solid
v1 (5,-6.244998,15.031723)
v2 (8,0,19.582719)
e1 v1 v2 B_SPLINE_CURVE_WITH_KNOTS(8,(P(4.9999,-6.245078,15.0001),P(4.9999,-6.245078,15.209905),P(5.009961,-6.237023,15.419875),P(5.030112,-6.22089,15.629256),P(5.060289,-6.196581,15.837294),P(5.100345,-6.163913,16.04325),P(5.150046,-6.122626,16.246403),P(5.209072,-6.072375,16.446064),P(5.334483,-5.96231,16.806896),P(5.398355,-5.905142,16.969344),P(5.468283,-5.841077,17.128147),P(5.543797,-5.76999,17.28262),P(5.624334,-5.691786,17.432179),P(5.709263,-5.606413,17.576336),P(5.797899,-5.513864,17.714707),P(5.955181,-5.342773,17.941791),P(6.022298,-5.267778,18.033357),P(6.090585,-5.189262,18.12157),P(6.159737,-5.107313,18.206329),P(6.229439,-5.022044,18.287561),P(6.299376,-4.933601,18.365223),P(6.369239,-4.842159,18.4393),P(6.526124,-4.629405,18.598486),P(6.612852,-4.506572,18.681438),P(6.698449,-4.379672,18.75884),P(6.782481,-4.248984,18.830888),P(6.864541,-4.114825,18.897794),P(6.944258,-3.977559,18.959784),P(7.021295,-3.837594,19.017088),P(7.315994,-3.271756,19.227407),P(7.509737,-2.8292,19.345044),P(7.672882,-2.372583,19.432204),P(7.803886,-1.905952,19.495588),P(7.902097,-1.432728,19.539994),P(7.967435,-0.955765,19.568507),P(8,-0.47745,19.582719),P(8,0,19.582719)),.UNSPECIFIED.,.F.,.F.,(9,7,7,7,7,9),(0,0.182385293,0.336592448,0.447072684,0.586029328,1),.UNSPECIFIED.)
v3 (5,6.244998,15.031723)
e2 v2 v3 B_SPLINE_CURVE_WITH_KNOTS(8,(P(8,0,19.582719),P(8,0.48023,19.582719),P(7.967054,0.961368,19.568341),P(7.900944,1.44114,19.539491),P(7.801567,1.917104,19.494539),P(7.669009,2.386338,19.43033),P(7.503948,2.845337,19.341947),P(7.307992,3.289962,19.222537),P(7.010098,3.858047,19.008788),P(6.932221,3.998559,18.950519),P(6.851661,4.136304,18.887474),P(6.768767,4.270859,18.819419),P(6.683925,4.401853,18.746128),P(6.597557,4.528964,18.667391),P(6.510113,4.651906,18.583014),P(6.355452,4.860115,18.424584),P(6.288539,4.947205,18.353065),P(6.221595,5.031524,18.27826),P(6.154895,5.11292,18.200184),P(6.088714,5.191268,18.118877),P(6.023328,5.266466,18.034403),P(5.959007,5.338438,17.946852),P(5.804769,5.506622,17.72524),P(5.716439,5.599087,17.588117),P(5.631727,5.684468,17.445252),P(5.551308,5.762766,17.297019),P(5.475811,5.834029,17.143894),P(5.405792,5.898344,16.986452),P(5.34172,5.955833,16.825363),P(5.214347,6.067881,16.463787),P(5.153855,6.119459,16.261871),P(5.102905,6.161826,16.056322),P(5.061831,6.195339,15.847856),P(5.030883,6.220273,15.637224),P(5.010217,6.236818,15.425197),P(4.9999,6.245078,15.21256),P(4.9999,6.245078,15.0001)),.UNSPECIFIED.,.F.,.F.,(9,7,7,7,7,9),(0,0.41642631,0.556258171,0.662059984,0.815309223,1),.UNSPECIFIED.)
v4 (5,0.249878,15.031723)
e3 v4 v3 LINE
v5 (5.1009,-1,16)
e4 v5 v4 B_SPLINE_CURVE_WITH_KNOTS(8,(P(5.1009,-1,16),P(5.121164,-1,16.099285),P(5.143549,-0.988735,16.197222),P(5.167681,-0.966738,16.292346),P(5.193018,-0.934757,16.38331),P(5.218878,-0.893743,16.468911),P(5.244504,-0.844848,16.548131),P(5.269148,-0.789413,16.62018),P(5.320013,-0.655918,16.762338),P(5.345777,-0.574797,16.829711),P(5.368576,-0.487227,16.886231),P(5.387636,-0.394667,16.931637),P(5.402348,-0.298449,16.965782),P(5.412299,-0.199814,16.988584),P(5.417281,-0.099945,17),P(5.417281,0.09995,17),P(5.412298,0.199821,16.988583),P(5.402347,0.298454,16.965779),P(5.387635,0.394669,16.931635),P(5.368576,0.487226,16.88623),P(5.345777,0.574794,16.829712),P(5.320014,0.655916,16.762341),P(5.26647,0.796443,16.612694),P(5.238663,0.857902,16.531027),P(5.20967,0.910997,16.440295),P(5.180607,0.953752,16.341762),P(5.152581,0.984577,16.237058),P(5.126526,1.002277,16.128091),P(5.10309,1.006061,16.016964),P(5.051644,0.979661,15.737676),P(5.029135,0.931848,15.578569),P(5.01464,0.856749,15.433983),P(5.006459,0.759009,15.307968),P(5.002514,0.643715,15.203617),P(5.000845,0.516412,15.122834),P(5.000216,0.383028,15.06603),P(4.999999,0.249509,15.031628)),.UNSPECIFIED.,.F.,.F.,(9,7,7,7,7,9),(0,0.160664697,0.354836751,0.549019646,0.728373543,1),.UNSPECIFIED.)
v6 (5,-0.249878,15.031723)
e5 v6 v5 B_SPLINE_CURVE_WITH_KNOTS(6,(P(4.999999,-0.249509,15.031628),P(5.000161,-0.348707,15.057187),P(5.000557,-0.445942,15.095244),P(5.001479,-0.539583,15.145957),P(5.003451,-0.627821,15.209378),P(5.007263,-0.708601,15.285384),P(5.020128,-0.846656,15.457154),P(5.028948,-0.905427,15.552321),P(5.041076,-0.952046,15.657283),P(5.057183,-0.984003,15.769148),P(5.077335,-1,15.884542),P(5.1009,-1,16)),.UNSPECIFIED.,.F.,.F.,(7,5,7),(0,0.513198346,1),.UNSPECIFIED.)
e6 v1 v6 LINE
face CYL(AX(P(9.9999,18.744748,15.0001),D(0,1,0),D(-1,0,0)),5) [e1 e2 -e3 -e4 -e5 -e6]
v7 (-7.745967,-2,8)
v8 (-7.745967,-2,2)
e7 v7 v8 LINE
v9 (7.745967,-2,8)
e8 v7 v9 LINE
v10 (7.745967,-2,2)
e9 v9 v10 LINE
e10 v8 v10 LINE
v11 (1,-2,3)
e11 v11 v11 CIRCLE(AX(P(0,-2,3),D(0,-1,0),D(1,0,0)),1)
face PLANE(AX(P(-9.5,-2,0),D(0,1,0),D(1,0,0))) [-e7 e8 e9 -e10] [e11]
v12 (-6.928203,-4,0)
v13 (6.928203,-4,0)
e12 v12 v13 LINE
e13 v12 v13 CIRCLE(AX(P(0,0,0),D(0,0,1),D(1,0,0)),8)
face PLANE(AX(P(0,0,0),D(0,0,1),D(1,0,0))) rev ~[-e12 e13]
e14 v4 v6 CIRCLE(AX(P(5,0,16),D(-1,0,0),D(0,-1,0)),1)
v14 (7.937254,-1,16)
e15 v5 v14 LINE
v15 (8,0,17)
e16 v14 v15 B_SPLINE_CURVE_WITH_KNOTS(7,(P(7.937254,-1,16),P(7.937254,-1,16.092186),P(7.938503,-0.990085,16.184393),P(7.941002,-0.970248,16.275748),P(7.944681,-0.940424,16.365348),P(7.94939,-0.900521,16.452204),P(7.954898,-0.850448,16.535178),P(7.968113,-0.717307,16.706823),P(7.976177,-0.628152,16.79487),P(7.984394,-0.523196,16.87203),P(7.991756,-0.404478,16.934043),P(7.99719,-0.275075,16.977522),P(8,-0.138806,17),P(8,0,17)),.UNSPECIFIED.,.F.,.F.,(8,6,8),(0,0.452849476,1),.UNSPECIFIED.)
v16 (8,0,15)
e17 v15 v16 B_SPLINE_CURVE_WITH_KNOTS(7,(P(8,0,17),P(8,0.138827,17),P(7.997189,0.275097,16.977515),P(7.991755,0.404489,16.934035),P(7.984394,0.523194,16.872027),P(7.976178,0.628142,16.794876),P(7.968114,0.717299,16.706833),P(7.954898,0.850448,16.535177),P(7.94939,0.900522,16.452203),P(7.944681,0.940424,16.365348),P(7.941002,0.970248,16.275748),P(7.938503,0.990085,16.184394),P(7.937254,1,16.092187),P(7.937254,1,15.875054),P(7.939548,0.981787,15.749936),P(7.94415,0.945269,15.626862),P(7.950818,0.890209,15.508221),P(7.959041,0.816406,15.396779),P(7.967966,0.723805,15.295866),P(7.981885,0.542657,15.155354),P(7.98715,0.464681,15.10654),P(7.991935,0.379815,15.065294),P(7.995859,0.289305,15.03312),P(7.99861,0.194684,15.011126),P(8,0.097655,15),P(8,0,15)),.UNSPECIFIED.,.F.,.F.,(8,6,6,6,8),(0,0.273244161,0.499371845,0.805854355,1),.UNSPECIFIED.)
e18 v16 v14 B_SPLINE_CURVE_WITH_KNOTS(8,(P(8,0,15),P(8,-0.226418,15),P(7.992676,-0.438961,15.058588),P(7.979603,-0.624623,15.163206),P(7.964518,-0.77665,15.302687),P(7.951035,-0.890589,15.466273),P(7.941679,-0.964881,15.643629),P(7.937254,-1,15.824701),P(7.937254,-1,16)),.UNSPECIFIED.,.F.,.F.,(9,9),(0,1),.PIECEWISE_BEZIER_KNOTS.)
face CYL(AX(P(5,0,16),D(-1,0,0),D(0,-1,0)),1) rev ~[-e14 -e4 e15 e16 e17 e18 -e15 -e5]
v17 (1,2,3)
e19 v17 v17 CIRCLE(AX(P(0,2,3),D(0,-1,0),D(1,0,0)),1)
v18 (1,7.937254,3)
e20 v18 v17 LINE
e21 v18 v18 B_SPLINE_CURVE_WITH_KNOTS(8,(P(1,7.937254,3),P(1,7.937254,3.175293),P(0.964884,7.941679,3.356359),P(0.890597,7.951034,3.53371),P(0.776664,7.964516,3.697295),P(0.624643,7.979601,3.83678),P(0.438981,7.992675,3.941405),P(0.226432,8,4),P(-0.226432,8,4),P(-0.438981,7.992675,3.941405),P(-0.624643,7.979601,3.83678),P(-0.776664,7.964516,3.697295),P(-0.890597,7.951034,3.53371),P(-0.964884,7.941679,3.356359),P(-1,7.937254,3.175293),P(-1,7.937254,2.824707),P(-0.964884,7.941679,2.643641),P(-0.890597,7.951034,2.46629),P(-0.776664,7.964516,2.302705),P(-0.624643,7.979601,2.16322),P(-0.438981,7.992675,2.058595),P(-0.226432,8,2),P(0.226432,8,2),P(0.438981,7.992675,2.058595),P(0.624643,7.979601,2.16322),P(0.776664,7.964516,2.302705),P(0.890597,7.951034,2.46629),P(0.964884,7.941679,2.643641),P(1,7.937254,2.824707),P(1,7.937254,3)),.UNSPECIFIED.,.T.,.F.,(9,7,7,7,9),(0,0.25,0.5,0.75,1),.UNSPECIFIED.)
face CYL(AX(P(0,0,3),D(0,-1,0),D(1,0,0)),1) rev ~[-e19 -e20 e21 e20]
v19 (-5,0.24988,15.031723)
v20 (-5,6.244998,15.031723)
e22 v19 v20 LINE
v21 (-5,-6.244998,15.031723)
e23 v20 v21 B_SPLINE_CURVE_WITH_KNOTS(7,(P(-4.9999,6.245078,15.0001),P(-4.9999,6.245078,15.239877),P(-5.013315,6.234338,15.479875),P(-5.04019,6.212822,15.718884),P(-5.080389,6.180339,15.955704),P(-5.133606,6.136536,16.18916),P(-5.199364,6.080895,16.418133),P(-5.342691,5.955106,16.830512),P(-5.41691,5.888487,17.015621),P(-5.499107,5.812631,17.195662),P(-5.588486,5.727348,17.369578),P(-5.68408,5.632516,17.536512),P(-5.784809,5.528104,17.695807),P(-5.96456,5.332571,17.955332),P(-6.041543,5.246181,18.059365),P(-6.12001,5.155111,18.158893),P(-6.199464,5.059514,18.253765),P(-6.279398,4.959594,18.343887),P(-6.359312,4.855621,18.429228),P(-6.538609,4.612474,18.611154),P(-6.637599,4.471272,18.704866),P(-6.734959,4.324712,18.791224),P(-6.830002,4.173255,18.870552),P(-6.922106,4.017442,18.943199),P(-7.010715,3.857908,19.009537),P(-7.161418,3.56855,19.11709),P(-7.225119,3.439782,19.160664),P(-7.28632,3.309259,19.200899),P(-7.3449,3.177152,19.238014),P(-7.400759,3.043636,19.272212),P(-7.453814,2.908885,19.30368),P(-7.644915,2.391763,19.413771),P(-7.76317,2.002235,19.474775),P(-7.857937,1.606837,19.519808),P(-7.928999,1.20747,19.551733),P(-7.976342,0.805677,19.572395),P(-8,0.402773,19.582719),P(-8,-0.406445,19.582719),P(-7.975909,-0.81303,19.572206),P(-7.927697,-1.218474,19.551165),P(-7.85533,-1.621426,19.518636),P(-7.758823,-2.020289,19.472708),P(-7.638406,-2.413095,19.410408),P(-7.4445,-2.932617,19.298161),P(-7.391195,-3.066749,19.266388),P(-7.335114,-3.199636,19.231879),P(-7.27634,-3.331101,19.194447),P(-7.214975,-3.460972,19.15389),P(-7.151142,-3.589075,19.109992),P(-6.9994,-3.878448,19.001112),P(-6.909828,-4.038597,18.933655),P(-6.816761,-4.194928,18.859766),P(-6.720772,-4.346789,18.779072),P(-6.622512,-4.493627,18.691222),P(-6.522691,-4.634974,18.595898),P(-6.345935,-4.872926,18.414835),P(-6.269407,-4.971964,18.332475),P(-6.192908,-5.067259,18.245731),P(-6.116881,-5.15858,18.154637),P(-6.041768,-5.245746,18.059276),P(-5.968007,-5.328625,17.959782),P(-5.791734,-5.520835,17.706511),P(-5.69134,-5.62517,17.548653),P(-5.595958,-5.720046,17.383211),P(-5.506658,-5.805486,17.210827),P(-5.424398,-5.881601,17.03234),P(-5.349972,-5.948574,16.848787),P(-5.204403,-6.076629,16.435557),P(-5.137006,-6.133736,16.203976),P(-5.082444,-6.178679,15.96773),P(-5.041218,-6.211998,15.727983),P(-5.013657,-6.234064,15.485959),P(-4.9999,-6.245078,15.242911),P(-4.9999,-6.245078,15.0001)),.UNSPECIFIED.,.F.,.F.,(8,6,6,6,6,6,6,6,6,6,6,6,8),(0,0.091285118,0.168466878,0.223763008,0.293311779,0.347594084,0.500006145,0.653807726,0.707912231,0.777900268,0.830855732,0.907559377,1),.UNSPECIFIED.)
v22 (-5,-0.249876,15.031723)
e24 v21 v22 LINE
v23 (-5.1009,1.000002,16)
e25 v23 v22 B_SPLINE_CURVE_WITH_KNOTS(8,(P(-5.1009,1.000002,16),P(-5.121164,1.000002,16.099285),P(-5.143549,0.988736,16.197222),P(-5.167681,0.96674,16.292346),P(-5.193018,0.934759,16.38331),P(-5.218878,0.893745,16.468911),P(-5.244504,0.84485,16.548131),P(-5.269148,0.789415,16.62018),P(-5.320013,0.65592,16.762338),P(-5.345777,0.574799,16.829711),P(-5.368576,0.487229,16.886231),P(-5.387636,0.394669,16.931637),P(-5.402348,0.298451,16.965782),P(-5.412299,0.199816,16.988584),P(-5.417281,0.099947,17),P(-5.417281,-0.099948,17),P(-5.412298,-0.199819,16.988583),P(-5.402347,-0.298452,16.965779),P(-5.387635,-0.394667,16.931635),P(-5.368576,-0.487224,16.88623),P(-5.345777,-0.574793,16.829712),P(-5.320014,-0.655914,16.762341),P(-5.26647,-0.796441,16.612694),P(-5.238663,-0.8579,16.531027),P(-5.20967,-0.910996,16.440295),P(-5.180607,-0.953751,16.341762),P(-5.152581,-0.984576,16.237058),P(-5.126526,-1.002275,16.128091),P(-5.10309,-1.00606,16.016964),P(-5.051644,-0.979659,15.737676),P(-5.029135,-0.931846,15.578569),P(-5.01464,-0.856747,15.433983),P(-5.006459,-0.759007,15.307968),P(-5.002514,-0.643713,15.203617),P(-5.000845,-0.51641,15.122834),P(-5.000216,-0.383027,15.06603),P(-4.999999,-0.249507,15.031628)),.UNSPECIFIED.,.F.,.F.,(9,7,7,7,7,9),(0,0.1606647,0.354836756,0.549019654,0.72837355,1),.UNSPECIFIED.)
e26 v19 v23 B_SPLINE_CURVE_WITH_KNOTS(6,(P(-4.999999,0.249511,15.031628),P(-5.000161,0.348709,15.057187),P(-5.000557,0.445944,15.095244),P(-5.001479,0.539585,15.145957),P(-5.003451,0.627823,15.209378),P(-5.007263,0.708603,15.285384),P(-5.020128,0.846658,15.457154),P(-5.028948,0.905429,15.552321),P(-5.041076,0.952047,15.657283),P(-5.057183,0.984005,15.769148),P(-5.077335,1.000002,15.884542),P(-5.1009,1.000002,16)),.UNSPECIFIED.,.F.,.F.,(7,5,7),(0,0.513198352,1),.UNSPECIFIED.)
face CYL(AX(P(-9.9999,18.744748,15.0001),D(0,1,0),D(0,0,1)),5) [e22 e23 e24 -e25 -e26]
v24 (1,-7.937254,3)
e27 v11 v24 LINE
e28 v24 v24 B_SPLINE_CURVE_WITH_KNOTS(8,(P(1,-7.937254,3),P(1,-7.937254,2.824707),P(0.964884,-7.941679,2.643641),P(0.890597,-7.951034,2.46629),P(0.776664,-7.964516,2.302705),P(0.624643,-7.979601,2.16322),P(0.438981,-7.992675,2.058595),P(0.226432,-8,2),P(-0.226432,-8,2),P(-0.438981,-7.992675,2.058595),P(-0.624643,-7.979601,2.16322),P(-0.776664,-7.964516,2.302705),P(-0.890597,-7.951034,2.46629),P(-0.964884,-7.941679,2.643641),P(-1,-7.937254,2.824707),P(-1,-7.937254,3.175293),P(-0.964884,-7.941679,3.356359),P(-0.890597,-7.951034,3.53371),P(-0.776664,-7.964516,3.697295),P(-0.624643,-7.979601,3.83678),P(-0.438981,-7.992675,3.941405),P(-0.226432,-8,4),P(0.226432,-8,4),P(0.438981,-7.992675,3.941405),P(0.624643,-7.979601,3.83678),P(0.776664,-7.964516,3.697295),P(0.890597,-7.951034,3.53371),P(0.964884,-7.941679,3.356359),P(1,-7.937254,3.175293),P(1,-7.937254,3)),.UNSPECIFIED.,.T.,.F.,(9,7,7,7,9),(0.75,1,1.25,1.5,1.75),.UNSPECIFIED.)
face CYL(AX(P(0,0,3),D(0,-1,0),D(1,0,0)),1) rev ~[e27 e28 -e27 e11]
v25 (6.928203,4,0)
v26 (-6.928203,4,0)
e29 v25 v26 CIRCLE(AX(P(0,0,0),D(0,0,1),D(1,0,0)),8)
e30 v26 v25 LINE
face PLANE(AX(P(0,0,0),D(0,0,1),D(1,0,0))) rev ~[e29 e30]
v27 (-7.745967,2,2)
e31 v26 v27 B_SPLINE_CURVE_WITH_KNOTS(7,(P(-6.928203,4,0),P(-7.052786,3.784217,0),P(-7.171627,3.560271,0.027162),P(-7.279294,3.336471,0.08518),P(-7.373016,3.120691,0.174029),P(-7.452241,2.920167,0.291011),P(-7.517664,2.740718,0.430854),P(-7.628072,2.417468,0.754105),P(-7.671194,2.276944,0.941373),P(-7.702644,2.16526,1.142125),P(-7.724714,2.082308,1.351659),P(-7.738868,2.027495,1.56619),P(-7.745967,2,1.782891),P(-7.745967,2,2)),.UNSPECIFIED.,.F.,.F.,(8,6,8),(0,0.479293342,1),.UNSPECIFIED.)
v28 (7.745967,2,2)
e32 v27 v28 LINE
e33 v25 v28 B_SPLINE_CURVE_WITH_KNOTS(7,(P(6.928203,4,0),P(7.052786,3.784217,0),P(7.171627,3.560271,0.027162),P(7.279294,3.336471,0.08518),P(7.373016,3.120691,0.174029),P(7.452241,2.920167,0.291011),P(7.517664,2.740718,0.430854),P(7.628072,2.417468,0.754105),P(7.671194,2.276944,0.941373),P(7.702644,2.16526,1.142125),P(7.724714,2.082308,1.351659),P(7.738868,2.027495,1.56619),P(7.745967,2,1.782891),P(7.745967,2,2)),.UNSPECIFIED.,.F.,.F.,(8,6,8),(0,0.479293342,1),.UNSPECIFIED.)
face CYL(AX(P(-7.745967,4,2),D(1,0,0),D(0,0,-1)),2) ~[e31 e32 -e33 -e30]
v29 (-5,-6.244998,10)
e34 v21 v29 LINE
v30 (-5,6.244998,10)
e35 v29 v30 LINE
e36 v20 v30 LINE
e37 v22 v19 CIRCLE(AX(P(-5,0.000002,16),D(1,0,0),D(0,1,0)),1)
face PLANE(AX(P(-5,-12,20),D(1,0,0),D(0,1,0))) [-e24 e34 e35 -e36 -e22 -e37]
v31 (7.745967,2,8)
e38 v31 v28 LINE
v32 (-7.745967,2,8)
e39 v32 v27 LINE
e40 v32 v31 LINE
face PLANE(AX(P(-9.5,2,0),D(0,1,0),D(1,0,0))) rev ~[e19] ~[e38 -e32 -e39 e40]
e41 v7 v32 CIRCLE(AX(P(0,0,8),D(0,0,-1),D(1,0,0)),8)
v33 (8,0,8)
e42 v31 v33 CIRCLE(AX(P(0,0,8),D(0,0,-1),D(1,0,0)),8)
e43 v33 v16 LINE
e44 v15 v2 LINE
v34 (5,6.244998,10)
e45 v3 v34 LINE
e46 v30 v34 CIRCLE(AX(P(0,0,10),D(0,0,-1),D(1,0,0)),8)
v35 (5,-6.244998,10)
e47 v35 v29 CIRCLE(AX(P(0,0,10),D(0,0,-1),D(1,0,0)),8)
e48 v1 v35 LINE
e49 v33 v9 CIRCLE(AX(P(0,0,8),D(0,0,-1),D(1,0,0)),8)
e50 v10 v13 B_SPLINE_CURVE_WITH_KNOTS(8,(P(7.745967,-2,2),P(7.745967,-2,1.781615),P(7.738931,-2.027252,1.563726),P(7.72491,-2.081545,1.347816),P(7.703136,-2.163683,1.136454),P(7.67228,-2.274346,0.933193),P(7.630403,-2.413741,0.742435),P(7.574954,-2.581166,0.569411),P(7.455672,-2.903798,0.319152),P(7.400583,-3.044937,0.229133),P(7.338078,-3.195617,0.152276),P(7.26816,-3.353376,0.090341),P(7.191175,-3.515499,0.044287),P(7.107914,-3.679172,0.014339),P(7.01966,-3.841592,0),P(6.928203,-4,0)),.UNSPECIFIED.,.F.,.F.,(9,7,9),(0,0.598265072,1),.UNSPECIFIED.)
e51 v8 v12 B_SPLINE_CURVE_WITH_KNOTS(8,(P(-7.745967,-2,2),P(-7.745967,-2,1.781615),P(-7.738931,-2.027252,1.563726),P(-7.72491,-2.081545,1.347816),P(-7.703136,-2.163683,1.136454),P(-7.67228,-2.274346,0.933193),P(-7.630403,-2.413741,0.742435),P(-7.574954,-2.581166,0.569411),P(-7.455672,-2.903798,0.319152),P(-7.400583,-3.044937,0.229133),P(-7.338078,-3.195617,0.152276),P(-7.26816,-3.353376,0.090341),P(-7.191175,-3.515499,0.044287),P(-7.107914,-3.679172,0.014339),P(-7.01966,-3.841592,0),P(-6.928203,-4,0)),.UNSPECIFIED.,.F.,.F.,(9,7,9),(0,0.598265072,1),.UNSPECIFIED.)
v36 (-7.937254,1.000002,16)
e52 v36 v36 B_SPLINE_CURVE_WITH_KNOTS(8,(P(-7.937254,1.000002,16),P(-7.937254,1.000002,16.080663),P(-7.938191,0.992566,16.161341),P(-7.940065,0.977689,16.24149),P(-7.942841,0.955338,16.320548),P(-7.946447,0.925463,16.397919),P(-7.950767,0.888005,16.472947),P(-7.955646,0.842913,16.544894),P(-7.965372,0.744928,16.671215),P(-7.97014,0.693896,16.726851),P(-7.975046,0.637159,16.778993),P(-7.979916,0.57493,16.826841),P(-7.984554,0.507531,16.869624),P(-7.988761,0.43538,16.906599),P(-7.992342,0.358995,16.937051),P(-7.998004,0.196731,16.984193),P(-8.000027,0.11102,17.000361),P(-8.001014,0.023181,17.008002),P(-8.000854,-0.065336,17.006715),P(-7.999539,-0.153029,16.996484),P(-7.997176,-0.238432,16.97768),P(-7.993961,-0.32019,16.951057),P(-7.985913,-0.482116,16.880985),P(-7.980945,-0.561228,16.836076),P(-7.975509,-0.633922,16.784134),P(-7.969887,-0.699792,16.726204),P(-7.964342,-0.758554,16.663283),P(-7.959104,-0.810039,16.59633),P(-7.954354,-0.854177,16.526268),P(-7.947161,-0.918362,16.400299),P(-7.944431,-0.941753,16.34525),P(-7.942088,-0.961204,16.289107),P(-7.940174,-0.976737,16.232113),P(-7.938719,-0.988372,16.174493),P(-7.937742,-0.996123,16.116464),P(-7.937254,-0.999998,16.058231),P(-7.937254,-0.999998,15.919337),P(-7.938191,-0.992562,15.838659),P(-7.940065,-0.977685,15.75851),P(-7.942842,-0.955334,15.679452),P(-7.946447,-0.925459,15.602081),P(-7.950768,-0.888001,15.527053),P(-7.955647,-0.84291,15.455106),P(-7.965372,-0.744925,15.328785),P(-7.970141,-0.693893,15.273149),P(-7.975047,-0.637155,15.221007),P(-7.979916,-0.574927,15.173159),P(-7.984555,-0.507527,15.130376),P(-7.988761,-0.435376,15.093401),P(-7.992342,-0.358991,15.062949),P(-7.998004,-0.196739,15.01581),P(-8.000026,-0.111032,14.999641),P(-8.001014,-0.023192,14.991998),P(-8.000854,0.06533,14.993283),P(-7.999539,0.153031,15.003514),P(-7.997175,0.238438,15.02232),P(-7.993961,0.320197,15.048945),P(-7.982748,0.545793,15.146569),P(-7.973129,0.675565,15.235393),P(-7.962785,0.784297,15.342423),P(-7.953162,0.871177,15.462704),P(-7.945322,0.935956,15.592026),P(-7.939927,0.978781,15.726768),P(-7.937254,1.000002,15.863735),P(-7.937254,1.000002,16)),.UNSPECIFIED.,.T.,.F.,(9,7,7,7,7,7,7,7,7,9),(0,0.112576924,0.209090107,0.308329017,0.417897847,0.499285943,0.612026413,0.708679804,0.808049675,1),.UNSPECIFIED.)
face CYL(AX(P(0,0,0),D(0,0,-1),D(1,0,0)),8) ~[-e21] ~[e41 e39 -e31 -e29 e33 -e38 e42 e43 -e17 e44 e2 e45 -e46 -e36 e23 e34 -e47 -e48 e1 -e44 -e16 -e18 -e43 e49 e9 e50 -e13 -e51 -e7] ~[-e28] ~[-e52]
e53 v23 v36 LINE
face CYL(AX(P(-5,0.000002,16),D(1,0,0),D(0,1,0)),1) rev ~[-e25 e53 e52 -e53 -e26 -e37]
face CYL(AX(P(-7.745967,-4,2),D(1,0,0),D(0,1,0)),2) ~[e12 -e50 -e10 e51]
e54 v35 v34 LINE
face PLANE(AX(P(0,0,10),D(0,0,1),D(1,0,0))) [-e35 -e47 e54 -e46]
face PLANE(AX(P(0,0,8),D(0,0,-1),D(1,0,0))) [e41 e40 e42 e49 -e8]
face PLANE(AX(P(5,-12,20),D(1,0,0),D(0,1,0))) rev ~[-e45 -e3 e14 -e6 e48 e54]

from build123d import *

# Parameters (mm, degrees)
F0_R         = 8
F1_DEPTH     = 20
F2_W         = 10
F2_H         = 24
F3_DEPTH     = 10
F4_W         = 19
F4_H         = 4
F5_DEPTH     = 8
F6_R         = 1
F7_DEPTH     = 5
F8_R         = 1
F9_DEPTH     = 5
F10_R        = 1
F11_DEPTH    = 8
F12_T1_DEPTH = 37.4894960018
F13_R        = 2


# Not quite as in the source:
# - a fillet or chamfer that OpenCascade refuses, or shapes differently, is made with other operations: its cross-section is extruded or revolved along the edge and cut away or added


with BuildPart() as f1:
    # F0 (on Top) → F1 (new body)
    with BuildSketch(Plane.XY):
        Circle(F0_R)
    extrude(amount=F1_DEPTH)

    # F2 (on face) → F3 (cut)
    with BuildSketch(Plane.XY.offset(20)):
        Rectangle(F2_W, F2_H)
    extrude(amount=-F3_DEPTH, mode=Mode.SUBTRACT)

    # F4 (on face) → F5 (cut)
    with BuildSketch(Plane(origin=(0, 0, 0), x_dir=(1, 0, 0), z_dir=(0, 0, -1))):
        Rectangle(F4_W, F4_H)
    extrude(amount=-F5_DEPTH, mode=Mode.SUBTRACT)

    # F6 (on face) → F7 (cut)
    with BuildSketch(Plane.YZ.offset(-5)):
        with Locations((1.8555e-06, 16)):
            Circle(F6_R)
    extrude(amount=-F7_DEPTH, mode=Mode.SUBTRACT)

    # F8 (on face) → F9 (cut)
    with BuildSketch(Plane(origin=(5, 0, 0), x_dir=(0, -1, 0), z_dir=(-1, 0, 0))):
        with Locations((0, 16)):
            Circle(F8_R)
    extrude(amount=-F9_DEPTH, mode=Mode.SUBTRACT)

    # F10 (on Front) → F11 (cut, symmetric)
    with BuildSketch(Plane.XZ):
        with Locations((0, 3)):
            Circle(F10_R)
    extrude(amount=F11_DEPTH, both=True, mode=Mode.SUBTRACT)

    # F12: fillet of radius 5 on 2 edges, made by hand

    # F12_s2 → F12_t1 (cut)
    with BuildSketch(Plane.XZ.offset(-18.7447480009)):
        with BuildLine():
            ThreePointArc((-9.9999, 20.0001), (-6.4643660941, 18.5356339059), (-4.9999, 15.0001))
            Line((-4.9999, 15.0001), (-4.8999, 15.0001))
            ThreePointArc((-4.8999, 15.0001), (-4.9, 17.50005), (-4.9, 20))
            Line((-4.9, 20), (-5, 20.1))
            ThreePointArc((-5, 20.1), (-7.49995, 20.1), (-9.9999, 20.1001))
            Line((-9.9999, 20.1001), (-9.9999, 20.0001))
        make_face()
        with BuildLine():
            ThreePointArc((4.9999, 15.0001), (6.4643660941, 18.5356339059), (9.9999, 20.0001))
            Line((9.9999, 20.0001), (9.9999, 20.1001))
            ThreePointArc((9.9999, 20.1001), (7.49995, 20.1), (5, 20.1))
            Line((5, 20.1), (4.9, 20))
            ThreePointArc((4.9, 20), (4.9, 17.50005), (4.8999, 15.0001))
            Line((4.8999, 15.0001), (4.9999, 15.0001))
        make_face()
    extrude(amount=F12_T1_DEPTH, mode=Mode.SUBTRACT)

    # F13
    f13_edges = [f1.edges().sort_by_distance(p)[0] for p in [
        (0, -2, 0),
        (0, 2, 0),
    ]]
    fillet(f13_edges, radius=F13_R)


solid = f1.part
